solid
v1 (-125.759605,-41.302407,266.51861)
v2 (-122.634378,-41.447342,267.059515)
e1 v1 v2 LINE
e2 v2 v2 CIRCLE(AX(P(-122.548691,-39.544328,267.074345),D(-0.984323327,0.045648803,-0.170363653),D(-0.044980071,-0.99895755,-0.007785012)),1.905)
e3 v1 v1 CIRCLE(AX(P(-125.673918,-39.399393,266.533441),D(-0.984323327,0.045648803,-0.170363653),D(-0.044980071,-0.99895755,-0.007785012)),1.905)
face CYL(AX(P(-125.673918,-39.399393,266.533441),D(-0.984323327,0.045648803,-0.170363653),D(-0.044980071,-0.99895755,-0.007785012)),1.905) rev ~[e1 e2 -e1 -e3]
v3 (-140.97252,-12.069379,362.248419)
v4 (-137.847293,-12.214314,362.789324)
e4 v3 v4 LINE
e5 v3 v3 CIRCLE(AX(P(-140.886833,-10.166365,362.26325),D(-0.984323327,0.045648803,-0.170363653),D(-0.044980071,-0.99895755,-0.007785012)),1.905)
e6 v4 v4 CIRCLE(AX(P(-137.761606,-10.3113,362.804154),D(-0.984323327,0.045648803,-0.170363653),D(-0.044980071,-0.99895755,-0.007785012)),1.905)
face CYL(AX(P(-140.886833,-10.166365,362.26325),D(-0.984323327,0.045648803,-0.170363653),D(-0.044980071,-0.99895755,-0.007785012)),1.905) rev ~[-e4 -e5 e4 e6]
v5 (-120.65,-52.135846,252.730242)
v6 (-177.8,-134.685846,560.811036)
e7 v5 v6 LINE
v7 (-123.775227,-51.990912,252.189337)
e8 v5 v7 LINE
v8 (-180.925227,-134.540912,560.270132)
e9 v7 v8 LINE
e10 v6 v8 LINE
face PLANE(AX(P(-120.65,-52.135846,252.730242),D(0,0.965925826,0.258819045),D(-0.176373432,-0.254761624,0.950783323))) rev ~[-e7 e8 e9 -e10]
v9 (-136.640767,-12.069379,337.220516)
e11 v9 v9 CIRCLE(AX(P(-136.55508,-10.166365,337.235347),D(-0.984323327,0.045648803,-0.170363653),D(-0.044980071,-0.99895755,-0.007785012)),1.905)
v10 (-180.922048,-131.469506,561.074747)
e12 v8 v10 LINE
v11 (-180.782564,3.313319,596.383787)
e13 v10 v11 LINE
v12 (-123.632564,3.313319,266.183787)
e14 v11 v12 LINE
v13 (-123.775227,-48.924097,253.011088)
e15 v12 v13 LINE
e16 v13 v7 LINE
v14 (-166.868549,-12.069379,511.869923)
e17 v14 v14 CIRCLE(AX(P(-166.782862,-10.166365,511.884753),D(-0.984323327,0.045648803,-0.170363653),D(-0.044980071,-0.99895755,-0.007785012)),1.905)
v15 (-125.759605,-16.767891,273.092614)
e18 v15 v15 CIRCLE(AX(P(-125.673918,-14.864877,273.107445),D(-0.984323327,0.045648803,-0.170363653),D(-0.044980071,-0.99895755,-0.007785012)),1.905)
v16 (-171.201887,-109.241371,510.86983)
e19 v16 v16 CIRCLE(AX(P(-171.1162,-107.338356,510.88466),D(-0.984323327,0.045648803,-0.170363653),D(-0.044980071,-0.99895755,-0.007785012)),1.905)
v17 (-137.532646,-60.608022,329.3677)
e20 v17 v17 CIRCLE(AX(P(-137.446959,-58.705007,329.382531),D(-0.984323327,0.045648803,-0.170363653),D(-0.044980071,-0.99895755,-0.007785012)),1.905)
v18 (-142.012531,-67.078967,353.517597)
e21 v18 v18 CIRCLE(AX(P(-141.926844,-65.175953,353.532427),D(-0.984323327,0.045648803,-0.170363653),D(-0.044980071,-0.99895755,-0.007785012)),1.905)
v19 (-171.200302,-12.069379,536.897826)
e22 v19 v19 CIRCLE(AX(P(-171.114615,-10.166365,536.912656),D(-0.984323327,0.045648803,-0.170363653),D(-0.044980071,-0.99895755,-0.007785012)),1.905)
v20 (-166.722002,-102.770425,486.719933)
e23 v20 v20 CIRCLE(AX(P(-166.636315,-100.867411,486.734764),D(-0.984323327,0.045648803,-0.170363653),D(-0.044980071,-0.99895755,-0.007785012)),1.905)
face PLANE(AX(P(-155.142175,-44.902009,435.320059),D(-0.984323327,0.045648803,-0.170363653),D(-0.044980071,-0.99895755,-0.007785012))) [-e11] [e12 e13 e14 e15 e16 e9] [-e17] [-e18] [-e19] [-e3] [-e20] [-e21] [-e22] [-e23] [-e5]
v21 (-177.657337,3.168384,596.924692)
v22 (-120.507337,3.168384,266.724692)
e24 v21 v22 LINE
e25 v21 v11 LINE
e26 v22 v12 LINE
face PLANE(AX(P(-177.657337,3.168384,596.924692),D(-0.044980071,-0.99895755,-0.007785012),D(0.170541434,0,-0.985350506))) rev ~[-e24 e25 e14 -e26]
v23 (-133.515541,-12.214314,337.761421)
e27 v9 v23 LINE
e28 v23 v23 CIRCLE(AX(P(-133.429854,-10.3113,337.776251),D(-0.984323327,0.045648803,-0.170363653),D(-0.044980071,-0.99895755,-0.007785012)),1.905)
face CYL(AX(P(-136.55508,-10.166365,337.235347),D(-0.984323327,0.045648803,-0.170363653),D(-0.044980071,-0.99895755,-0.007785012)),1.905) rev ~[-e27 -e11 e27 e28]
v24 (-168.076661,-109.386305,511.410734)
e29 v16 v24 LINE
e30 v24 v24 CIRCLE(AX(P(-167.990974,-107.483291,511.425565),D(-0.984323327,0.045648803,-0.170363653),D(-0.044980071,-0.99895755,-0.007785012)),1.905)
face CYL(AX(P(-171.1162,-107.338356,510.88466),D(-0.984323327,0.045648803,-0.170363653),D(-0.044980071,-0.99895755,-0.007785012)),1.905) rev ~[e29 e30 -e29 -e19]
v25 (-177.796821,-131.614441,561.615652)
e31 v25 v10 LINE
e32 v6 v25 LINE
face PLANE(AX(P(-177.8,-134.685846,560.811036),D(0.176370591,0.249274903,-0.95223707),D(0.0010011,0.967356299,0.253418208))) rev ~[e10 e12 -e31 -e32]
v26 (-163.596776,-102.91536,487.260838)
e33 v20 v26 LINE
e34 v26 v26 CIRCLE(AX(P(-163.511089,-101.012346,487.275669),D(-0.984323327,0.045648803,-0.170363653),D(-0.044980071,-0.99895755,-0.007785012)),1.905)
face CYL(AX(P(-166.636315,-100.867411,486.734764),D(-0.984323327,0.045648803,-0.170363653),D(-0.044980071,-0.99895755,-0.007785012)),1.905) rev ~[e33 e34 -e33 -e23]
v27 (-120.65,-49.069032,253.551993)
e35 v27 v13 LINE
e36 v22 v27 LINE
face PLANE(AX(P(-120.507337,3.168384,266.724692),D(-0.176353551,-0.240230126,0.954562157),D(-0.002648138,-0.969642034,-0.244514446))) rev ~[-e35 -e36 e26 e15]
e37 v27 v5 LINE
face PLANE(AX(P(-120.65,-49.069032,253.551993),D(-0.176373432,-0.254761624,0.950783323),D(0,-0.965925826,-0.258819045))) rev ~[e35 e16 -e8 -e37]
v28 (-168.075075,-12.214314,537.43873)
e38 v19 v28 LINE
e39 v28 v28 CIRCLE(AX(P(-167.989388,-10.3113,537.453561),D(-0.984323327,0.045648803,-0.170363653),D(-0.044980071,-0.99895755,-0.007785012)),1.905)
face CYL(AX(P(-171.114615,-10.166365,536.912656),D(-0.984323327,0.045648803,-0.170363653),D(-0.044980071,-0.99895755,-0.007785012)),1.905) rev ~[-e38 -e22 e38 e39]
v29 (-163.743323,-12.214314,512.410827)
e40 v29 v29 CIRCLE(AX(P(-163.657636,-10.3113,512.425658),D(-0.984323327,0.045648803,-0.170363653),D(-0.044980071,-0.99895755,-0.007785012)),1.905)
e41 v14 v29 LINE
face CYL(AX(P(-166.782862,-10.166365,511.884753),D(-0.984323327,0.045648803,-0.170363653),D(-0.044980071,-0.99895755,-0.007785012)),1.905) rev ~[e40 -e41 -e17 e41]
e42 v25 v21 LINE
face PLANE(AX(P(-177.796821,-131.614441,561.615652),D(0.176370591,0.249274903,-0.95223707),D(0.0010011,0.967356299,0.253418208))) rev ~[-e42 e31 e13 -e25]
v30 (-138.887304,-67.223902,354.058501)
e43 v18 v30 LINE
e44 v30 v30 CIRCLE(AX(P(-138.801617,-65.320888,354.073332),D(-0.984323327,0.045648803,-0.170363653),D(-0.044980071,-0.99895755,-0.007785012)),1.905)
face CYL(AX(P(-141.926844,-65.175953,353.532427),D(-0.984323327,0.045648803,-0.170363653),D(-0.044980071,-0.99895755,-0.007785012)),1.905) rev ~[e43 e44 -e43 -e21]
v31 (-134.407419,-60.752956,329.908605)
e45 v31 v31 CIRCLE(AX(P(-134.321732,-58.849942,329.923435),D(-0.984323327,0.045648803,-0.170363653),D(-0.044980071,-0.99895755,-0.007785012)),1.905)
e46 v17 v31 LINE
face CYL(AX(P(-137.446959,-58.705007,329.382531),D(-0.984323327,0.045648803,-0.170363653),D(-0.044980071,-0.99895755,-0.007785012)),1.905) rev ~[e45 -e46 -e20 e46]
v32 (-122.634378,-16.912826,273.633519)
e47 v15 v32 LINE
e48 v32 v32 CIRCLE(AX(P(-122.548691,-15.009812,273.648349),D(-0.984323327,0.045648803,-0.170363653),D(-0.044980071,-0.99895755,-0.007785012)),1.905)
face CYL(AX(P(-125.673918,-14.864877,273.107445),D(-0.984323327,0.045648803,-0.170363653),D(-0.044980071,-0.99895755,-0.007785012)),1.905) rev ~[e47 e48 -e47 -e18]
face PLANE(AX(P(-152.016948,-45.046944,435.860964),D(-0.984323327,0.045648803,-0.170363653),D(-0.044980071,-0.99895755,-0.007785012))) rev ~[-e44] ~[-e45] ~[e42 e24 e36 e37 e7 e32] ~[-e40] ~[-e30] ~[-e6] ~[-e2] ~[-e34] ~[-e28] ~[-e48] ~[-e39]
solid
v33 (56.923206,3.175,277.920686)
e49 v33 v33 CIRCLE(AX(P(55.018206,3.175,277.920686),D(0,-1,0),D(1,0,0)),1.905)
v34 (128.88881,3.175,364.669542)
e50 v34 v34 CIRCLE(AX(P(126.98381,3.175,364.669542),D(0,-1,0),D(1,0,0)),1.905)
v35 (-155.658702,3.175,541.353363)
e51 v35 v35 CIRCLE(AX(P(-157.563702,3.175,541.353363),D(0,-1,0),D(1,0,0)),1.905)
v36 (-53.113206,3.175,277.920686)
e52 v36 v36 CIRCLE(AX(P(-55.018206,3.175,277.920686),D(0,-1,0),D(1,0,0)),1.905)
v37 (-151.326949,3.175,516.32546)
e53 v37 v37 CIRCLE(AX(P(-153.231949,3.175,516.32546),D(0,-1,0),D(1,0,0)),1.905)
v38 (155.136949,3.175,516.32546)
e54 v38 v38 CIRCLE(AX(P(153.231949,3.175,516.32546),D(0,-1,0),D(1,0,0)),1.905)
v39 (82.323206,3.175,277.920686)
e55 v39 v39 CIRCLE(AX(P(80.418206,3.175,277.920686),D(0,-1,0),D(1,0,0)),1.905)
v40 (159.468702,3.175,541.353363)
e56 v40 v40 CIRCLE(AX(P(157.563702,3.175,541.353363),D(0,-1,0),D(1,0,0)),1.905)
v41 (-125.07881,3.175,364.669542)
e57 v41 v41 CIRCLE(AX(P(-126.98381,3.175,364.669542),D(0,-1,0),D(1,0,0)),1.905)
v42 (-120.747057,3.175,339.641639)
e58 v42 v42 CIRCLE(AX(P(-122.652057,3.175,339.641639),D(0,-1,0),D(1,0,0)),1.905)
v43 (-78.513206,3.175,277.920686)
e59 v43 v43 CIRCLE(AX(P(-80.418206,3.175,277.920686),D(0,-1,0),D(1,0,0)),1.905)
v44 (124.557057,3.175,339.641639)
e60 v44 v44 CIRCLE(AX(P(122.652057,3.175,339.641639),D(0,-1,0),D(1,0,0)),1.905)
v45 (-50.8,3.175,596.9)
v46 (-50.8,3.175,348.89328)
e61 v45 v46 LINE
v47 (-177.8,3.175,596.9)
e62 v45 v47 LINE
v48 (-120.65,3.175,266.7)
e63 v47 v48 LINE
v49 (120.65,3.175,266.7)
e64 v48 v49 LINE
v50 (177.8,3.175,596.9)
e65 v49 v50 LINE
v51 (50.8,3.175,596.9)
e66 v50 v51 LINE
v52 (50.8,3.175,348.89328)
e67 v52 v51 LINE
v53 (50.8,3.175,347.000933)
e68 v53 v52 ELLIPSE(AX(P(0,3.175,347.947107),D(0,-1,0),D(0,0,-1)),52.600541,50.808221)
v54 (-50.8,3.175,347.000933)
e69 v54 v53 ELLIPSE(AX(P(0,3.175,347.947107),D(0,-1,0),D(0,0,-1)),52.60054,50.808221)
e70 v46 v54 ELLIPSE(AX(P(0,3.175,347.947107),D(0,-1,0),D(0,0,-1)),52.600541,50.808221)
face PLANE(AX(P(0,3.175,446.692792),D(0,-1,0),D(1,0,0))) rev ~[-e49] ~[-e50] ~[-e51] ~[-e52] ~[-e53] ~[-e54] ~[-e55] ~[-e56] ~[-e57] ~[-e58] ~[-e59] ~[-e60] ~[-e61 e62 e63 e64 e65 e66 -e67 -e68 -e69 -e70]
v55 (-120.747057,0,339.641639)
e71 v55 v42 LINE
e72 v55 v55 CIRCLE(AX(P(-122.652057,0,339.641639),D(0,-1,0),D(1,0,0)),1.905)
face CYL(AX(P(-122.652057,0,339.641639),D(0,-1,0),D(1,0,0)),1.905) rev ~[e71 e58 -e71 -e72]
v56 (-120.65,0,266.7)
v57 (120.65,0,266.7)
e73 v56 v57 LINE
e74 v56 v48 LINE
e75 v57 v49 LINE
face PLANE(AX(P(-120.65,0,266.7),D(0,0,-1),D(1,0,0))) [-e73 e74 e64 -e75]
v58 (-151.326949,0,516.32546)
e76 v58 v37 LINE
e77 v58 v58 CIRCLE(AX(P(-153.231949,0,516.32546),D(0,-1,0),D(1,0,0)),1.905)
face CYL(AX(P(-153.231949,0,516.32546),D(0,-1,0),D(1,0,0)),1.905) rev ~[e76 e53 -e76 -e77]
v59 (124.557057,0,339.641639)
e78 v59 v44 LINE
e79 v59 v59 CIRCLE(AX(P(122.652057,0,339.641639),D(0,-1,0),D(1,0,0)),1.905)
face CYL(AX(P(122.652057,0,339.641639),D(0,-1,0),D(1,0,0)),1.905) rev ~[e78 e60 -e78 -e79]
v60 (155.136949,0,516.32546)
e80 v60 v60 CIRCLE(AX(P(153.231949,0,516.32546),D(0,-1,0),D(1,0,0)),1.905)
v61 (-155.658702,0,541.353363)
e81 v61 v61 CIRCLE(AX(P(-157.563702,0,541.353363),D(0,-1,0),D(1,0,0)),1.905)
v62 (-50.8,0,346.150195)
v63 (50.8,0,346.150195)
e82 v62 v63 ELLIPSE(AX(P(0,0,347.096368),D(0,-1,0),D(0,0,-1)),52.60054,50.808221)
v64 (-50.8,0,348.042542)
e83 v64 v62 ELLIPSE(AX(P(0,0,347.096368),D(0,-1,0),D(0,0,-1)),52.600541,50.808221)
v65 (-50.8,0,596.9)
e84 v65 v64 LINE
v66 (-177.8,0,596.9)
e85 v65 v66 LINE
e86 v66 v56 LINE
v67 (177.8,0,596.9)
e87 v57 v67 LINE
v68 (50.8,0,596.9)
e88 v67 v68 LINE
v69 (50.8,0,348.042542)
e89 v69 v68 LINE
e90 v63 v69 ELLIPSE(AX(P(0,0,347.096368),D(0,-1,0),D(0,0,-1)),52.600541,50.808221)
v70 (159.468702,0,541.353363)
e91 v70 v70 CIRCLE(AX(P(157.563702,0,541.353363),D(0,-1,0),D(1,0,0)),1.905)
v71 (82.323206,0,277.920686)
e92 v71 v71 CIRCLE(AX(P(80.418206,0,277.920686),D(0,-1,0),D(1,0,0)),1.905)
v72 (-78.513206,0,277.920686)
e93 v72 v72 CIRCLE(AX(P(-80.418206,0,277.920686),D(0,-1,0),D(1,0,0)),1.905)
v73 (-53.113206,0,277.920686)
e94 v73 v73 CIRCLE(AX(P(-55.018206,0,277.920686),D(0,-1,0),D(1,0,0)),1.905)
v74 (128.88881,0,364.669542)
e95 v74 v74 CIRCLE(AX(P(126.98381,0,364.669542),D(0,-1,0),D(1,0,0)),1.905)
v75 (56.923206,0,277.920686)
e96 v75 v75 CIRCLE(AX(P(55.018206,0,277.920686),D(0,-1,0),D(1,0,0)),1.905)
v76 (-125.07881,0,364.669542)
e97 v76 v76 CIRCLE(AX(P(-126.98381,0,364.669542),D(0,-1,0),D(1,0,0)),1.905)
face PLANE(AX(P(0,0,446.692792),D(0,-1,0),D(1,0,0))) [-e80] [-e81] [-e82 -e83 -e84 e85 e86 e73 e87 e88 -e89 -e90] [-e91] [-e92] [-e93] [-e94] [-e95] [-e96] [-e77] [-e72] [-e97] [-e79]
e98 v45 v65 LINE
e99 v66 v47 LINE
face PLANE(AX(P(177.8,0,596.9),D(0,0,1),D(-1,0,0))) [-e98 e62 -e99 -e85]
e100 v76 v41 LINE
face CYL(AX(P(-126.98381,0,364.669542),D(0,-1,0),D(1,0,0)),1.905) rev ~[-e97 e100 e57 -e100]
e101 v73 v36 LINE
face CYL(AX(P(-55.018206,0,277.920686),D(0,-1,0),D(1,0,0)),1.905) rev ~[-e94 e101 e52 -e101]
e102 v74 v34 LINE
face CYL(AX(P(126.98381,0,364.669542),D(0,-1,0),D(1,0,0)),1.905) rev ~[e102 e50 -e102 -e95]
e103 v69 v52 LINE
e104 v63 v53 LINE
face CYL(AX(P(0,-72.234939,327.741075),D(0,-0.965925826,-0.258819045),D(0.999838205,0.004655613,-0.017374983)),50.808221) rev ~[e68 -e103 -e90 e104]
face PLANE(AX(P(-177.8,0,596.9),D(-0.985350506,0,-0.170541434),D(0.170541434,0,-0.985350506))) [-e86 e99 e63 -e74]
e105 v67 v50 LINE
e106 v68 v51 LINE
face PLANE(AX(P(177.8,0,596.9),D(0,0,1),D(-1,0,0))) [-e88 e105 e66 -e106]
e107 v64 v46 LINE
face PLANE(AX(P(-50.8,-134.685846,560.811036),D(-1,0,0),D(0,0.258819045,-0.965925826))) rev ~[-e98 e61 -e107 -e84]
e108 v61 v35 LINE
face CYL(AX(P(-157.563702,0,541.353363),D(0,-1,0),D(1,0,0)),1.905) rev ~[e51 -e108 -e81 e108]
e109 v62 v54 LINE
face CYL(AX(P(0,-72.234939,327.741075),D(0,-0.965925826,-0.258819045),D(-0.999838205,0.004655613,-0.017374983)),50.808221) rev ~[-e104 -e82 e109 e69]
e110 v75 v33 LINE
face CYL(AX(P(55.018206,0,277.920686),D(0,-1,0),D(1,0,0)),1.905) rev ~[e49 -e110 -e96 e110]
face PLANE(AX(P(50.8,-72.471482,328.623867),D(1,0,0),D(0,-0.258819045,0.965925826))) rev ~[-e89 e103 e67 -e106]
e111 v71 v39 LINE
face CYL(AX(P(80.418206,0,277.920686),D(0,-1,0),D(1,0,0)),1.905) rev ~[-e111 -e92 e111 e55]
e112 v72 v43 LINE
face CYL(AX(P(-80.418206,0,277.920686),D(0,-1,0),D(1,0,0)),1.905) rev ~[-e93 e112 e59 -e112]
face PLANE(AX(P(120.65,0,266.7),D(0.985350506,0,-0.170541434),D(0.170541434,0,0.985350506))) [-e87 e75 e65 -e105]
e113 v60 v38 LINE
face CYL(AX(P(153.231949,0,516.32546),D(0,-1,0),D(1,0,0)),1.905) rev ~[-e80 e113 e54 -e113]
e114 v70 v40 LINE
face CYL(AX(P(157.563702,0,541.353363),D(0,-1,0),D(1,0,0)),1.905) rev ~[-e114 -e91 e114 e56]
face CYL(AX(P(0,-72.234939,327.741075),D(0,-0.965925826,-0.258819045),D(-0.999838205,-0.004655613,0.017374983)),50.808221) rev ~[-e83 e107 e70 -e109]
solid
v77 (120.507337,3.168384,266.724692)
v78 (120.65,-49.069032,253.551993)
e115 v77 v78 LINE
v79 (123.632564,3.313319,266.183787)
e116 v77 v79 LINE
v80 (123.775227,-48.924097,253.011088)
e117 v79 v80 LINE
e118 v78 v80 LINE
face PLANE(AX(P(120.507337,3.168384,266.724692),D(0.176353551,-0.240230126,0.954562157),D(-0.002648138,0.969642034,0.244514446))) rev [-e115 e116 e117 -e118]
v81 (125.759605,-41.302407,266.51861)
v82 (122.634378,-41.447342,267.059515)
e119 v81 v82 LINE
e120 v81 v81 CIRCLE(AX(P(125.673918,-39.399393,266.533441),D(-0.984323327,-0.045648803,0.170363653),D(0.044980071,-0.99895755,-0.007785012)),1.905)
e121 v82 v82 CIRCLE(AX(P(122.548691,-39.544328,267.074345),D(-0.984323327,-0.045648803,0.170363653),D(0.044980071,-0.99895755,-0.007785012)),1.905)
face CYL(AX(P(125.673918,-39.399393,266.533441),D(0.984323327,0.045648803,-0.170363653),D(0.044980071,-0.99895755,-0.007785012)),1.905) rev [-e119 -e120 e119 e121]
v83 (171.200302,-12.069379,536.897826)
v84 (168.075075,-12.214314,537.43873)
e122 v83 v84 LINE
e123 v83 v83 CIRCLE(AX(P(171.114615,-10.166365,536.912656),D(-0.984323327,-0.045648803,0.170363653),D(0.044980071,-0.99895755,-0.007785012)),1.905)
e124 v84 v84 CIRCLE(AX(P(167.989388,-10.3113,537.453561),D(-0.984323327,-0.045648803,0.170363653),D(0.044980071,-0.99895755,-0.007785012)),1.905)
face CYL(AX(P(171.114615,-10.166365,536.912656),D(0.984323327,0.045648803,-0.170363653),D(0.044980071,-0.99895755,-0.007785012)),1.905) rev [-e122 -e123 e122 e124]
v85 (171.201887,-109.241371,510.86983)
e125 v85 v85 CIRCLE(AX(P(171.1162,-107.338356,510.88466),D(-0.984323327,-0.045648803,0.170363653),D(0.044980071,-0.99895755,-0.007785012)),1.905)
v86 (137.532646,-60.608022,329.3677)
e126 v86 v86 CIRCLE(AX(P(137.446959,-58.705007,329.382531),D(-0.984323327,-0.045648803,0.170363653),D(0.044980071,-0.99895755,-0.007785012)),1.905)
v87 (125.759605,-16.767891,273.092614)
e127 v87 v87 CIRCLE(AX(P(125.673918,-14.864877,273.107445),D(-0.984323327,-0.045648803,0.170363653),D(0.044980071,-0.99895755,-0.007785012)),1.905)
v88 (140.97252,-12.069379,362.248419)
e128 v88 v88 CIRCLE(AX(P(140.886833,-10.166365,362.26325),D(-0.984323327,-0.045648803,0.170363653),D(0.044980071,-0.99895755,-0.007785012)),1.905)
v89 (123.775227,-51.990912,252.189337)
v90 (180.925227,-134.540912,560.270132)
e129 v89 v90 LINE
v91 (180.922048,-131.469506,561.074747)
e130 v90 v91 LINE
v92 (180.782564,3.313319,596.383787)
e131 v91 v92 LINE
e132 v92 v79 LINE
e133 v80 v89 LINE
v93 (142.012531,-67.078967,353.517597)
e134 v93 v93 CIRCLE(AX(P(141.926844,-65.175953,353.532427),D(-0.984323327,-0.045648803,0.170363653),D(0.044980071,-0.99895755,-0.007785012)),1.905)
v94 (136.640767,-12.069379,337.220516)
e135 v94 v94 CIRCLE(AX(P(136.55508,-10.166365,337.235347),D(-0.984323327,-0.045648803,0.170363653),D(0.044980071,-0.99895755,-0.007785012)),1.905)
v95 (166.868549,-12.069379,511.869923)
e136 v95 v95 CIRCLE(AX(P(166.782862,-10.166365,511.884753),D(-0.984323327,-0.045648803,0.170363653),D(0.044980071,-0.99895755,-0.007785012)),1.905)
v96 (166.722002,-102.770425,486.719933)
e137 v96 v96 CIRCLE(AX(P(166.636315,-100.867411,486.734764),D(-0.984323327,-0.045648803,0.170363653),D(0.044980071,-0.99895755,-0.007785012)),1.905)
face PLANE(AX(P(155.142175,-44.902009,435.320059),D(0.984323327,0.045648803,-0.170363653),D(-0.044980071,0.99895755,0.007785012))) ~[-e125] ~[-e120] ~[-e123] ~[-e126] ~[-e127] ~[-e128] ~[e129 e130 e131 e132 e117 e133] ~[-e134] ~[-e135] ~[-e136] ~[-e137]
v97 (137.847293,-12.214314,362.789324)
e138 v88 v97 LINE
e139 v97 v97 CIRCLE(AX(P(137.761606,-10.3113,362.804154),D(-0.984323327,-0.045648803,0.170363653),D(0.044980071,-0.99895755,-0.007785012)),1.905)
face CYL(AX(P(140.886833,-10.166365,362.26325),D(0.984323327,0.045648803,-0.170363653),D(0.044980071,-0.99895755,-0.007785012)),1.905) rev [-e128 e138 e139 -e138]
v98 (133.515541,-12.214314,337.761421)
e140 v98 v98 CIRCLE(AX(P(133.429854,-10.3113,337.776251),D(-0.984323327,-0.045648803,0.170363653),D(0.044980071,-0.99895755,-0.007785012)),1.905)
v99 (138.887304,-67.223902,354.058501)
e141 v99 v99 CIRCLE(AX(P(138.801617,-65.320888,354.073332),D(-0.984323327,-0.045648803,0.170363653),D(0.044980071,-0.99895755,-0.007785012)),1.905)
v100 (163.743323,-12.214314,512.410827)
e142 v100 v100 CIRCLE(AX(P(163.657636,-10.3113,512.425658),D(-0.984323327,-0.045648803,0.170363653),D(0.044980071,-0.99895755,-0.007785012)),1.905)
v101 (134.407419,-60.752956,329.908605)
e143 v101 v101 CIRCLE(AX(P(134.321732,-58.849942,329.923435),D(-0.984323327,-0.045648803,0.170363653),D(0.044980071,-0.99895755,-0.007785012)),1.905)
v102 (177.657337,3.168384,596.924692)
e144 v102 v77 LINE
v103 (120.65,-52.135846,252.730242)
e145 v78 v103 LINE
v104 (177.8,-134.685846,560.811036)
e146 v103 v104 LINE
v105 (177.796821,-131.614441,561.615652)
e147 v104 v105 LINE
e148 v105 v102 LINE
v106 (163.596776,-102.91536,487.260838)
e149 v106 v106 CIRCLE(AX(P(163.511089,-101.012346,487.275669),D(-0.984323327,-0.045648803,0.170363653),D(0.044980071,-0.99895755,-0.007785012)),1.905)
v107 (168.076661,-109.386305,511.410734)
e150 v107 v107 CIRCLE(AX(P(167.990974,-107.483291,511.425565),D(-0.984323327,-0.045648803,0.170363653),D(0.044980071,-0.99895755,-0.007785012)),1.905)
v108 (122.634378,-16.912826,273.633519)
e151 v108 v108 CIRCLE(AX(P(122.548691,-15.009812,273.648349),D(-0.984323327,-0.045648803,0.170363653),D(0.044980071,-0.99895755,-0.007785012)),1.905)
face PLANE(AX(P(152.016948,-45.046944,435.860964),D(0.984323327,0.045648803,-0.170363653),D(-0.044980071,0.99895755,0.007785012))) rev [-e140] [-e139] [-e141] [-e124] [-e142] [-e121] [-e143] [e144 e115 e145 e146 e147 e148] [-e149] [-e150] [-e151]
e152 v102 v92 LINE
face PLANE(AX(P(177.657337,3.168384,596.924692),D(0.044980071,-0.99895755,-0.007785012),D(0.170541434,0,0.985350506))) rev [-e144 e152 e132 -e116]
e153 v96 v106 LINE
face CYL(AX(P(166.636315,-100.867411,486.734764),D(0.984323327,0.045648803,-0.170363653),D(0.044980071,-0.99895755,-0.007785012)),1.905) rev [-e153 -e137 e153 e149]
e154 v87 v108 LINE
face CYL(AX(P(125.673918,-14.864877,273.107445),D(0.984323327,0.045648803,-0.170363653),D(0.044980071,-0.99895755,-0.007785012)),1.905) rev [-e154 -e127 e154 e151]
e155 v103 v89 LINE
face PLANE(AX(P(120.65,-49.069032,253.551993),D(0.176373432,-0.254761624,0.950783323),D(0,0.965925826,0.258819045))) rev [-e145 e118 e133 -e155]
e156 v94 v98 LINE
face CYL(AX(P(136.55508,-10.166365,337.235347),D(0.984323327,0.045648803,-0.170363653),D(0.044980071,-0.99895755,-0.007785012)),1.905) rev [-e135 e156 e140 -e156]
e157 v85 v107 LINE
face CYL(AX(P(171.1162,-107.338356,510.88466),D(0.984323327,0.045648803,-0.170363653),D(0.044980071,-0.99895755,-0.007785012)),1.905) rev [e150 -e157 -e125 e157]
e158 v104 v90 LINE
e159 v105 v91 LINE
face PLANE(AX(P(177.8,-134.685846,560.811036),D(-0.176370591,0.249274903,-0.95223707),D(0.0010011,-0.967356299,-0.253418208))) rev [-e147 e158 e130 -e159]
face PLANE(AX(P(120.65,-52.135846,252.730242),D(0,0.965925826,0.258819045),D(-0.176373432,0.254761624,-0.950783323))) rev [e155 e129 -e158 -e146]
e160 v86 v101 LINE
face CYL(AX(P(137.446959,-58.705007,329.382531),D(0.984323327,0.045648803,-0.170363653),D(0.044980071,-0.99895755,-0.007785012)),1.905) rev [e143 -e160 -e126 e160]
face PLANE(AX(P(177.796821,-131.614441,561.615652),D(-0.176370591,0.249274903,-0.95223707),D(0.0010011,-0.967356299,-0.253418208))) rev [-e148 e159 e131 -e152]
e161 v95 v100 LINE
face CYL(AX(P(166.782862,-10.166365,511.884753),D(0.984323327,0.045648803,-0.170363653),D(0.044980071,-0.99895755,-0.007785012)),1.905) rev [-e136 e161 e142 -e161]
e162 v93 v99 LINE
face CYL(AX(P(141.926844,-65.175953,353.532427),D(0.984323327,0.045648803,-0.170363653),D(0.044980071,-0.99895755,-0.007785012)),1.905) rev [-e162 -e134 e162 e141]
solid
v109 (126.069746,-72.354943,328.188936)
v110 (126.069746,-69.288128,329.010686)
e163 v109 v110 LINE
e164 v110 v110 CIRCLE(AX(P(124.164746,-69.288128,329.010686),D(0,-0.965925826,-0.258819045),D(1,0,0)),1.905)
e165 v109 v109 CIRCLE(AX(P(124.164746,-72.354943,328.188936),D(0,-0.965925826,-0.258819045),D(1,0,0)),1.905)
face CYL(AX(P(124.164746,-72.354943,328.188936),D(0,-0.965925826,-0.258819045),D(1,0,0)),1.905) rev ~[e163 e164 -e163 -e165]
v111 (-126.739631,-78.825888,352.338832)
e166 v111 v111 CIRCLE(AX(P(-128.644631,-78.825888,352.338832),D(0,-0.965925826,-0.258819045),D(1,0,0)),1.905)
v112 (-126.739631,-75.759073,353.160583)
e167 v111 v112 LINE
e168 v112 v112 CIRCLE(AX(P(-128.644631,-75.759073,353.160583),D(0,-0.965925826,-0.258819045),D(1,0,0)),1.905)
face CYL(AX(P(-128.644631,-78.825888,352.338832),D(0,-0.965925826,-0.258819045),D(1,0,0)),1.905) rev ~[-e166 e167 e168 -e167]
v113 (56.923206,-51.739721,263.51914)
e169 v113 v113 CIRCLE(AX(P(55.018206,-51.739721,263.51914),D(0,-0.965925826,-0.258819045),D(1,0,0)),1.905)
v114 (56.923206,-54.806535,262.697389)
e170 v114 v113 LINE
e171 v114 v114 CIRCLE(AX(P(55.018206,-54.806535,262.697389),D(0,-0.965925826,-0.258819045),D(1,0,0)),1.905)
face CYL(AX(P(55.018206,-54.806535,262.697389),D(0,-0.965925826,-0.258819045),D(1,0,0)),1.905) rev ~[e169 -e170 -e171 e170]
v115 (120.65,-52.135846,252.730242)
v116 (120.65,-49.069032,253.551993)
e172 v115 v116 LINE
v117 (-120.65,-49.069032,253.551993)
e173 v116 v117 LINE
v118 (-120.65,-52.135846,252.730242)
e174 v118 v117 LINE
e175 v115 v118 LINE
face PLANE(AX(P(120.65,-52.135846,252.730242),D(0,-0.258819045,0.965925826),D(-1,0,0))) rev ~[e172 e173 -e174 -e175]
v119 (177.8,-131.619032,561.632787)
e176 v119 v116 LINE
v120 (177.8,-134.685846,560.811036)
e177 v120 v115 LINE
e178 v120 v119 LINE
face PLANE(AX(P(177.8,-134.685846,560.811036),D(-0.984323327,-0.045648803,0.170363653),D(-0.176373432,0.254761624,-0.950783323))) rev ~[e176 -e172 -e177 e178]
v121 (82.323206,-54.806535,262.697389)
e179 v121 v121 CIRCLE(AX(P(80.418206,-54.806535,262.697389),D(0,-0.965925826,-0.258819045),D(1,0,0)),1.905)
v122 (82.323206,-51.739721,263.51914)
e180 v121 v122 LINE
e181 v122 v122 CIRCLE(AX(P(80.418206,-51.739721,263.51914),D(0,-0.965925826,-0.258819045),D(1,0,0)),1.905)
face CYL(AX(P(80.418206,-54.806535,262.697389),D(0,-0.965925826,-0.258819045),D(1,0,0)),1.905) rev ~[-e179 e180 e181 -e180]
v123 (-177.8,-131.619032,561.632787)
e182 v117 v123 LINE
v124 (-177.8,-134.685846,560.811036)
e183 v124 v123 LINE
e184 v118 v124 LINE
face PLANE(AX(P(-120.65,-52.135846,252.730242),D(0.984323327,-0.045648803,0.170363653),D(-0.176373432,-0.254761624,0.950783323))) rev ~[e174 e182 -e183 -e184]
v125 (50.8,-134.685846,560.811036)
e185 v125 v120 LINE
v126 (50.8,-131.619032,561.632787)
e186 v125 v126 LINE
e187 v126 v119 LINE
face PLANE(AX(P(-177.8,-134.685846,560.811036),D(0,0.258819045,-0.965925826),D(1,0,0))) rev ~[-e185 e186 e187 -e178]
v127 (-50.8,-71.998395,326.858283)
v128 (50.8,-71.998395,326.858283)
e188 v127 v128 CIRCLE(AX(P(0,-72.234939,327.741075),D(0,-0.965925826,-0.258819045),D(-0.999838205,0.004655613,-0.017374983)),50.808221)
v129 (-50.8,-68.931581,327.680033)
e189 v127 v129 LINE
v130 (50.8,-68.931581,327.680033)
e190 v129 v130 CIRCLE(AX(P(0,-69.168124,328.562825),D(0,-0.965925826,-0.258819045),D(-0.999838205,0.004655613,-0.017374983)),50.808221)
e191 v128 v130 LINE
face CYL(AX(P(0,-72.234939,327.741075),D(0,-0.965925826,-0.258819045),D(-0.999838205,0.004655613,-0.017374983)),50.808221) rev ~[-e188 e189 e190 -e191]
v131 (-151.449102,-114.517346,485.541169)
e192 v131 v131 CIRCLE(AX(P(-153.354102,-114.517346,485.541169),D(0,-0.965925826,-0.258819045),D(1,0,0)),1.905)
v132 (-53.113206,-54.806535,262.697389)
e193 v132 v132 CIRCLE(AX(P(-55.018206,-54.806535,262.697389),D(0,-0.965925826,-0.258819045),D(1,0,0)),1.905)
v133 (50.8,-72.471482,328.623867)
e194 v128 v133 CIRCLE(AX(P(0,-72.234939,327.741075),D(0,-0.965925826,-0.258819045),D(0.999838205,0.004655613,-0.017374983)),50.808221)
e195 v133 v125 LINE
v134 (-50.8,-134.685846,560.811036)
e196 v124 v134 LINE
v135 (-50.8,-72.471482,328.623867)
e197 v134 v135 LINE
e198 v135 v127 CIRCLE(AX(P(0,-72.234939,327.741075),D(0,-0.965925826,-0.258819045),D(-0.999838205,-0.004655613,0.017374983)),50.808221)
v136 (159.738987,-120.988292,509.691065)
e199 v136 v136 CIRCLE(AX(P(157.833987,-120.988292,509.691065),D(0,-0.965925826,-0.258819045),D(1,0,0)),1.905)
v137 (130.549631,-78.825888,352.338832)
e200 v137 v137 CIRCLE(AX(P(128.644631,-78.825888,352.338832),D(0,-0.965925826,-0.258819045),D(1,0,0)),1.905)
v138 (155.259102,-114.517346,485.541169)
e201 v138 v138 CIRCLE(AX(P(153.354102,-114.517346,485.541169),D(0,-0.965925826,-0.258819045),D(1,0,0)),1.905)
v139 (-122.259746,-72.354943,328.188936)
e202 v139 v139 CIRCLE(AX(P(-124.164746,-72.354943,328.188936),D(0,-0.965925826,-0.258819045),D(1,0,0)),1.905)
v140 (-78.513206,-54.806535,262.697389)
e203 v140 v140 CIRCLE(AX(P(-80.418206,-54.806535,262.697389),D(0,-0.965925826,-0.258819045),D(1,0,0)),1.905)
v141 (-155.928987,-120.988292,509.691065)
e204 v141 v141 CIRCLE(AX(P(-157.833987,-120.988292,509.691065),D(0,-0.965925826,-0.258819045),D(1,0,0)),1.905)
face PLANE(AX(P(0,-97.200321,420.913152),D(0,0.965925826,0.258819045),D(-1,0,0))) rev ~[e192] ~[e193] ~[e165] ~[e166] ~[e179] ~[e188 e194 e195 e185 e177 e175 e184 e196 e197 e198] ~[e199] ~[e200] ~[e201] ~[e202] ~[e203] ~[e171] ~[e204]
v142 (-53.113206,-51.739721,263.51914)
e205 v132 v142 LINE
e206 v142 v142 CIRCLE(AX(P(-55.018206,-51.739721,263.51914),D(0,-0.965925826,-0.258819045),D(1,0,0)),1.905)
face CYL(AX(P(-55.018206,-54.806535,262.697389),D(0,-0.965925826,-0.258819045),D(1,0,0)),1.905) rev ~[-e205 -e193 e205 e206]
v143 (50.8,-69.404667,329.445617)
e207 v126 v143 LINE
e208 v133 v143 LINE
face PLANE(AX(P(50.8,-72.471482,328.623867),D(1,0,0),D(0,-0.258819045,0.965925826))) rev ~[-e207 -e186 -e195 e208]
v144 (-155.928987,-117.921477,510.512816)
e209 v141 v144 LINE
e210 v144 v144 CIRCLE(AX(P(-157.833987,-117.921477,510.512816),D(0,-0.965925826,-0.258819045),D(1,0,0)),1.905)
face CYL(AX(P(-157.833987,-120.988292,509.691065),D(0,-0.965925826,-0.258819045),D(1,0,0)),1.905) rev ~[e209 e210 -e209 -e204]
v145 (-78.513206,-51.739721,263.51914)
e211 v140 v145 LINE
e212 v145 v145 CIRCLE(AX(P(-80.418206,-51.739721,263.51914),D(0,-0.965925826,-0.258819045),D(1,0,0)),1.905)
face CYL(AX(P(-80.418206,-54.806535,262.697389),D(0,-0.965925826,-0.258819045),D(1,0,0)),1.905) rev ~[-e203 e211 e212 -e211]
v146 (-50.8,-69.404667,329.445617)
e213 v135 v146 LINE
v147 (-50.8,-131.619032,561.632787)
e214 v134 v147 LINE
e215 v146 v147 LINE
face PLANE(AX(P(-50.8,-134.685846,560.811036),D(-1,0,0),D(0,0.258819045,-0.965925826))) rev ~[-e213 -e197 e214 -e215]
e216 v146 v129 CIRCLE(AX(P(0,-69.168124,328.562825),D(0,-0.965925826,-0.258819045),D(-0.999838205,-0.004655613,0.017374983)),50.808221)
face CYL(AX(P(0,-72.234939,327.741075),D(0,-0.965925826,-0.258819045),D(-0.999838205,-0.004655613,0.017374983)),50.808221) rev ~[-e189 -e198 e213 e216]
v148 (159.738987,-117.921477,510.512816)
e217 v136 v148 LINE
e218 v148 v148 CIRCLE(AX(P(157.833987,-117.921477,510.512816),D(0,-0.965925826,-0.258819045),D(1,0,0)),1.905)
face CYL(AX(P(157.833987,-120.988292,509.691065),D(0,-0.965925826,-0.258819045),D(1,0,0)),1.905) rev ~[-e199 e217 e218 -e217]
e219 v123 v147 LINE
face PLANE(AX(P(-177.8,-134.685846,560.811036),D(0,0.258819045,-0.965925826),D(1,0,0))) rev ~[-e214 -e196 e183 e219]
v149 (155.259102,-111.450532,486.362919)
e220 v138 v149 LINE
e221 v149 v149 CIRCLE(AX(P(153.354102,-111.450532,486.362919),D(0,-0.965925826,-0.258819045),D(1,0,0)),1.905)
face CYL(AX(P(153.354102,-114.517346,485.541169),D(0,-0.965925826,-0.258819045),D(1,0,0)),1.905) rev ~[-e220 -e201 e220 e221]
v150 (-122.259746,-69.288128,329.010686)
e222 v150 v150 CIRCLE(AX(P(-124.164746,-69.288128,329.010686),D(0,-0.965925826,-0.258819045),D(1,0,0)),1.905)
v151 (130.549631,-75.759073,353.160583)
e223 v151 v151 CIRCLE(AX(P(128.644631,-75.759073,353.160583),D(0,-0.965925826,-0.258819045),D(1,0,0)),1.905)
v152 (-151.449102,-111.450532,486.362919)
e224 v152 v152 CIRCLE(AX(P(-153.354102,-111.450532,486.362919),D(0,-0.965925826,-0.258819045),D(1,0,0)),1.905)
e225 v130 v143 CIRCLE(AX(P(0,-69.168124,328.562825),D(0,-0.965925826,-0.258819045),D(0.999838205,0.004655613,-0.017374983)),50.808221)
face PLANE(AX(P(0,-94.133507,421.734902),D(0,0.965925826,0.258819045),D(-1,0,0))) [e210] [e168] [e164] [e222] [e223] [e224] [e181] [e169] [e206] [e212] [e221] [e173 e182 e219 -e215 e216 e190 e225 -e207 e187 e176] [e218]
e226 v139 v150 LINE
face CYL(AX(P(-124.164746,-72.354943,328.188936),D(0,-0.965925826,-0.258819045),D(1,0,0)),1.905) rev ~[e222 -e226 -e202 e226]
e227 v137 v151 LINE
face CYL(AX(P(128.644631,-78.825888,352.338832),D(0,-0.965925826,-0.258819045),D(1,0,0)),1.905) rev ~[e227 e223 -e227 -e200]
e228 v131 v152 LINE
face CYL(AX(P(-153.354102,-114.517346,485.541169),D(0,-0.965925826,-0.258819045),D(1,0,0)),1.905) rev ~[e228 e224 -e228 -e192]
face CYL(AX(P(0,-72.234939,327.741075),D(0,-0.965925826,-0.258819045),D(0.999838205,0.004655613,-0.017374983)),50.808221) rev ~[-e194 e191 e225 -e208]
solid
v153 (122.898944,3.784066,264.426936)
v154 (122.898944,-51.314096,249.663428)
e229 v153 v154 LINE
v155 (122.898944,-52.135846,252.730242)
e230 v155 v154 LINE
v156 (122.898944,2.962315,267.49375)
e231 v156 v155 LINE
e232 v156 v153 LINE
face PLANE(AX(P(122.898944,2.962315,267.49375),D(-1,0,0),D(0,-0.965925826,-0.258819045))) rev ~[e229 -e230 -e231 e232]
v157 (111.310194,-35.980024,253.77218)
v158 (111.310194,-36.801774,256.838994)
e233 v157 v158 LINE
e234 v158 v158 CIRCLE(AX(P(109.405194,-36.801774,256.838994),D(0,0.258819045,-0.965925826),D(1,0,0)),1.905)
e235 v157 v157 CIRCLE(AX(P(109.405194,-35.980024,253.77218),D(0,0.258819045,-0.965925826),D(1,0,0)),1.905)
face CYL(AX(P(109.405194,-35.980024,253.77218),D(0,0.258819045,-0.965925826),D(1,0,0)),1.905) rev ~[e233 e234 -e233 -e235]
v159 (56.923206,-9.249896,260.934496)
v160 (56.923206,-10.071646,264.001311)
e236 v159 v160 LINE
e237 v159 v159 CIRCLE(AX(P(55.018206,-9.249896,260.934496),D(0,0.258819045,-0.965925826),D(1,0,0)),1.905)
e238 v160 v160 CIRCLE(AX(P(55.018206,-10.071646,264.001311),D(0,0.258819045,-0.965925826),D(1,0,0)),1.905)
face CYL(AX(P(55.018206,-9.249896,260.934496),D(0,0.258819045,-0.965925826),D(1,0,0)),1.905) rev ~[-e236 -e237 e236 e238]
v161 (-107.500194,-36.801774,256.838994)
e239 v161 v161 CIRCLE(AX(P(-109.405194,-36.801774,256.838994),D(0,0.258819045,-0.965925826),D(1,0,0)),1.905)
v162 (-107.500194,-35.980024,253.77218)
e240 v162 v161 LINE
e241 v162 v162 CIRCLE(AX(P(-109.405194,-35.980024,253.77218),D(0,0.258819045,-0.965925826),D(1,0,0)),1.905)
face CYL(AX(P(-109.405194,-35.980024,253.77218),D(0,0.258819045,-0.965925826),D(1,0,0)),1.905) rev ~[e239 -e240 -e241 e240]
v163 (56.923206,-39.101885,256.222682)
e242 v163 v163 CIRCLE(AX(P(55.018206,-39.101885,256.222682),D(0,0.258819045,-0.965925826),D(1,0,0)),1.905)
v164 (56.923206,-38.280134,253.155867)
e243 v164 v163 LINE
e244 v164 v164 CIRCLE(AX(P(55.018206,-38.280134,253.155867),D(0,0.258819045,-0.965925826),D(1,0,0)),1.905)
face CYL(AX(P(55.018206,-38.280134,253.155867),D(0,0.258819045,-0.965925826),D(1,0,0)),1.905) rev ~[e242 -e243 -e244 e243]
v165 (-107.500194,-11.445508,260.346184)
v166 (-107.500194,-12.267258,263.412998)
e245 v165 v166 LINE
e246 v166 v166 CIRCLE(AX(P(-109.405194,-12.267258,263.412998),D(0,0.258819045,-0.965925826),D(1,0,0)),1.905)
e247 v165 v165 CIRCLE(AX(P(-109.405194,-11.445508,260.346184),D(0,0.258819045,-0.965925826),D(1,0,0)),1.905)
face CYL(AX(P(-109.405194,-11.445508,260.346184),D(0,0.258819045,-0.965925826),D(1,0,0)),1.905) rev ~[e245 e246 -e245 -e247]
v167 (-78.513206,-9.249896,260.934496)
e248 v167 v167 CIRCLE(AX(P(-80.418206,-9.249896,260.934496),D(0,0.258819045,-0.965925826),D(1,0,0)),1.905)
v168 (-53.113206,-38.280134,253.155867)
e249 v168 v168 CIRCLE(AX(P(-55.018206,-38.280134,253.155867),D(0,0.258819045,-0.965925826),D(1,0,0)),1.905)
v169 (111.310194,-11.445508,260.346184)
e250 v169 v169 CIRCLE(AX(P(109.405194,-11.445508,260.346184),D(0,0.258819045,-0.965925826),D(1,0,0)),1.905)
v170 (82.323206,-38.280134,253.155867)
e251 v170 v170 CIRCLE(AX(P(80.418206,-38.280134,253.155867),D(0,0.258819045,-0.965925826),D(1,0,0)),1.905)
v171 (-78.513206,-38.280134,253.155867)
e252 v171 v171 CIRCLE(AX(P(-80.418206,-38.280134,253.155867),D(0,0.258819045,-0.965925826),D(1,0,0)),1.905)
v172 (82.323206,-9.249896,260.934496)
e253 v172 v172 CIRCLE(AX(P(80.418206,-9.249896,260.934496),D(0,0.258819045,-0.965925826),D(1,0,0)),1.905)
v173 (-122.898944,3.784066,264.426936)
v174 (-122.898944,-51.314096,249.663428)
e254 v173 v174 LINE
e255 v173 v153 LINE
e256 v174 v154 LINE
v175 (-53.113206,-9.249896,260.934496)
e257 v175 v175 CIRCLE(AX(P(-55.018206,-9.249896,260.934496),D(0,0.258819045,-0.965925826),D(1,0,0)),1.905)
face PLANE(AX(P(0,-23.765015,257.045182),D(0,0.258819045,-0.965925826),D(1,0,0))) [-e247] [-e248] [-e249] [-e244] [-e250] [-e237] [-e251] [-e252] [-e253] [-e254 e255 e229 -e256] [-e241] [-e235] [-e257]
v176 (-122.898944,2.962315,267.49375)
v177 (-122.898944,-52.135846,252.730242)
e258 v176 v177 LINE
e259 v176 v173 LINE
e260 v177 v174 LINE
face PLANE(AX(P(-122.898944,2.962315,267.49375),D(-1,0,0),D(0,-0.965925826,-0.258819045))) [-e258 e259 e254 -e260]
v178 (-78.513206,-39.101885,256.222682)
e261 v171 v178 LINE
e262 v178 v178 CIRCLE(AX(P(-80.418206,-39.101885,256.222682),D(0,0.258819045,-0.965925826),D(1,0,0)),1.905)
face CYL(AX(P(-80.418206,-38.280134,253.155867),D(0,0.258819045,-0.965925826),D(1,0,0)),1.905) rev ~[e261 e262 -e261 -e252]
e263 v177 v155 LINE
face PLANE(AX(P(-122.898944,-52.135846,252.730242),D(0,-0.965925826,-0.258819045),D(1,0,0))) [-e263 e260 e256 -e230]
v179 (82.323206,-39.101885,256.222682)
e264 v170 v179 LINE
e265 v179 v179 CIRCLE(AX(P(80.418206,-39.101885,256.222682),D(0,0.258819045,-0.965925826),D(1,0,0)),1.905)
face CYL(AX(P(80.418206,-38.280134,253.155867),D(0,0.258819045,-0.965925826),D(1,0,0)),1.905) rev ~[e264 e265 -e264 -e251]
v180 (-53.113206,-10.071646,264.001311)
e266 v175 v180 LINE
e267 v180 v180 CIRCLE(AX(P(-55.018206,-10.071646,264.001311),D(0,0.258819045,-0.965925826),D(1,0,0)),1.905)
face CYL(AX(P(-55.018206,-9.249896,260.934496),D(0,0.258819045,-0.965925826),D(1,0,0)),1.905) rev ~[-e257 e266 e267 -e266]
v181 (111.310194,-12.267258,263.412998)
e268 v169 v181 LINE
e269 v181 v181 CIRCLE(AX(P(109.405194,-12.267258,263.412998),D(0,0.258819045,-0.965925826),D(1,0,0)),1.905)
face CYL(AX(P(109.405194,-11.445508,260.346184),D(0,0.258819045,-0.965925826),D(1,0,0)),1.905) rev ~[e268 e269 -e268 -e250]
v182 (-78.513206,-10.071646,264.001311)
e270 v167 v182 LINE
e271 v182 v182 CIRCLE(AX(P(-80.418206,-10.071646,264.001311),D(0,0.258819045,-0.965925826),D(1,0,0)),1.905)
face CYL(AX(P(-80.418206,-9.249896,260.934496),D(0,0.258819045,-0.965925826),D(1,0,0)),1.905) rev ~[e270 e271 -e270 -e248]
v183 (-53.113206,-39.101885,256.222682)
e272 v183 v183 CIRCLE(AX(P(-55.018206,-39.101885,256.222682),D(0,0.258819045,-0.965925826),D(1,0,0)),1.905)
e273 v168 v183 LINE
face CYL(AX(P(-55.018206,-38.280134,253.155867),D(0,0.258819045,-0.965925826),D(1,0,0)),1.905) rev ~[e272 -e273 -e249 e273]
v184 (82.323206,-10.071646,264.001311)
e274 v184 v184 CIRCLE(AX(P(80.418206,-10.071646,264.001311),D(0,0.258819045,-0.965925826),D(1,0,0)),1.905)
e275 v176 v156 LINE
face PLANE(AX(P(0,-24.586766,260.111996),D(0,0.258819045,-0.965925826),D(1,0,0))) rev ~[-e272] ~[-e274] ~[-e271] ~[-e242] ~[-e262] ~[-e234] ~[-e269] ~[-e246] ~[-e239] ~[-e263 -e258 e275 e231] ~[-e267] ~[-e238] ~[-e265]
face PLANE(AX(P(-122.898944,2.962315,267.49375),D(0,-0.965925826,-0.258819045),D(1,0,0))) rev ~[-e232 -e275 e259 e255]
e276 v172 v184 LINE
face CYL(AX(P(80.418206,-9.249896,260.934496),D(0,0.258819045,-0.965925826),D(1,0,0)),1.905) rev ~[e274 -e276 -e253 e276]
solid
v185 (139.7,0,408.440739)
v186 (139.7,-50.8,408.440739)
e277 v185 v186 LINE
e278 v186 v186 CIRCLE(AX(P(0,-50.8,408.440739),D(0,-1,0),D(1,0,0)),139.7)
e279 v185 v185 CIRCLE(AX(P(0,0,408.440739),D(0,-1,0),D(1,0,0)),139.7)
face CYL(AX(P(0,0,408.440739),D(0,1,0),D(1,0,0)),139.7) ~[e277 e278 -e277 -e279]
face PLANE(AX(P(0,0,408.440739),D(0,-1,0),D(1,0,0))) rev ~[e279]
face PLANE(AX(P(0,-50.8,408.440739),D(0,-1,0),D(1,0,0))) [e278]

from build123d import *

# Parameters (mm, degrees)
F2_DEPTH  = 3.175
F3_R      = 139.7
F4_DEPTH  = 50.8
F8_DEPTH  = 3.175
F10_DEPTH = 3.175
F12_W     = 245.7978874445
F12_H     = 57.0418144985
F13_DEPTH = 3.175
F14_R     = 1.905
F15_DEPTH = 3.175
F16_R     = 1.905
F17_DEPTH = 362.430062838
F20_R     = 1.905
F21_DEPTH = 3.175
F22_R     = 1.905
F23_DEPTH = 3.175
F25_DEPTH = 143.0995662429


with BuildPart() as f2:
    # F1 (on Front) → F2 (new body)
    with BuildSketch(Plane.XZ):
        Polygon((120.65, 266.7), (177.8, 596.9), (-177.8, 596.9), (-120.65, 266.7), align=None)
    extrude(amount=-F2_DEPTH)

    # F20 (on face) → F21 (cut, through all)
    with BuildSketch(Plane.XZ):
        with Locations((-157.56370177, 541.3533633243)):
            Circle(F20_R)
        with Locations((-153.2319493539, 516.3254604756)):
            Circle(F20_R)
        with Locations((-126.9838096234, 364.6695420328)):
            Circle(F20_R)
        with Locations((-122.6520572073, 339.641639184)):
            Circle(F20_R)
        with Locations((-55.0182062805, 277.9206855015)):
            Circle(F20_R)
        with Locations((-80.4182062805, 277.9206855015)):
            Circle(F20_R)
        with Locations((126.9838096234, 364.6695420328)):
            Circle(F20_R)
        with Locations((153.2319493539, 516.3254604756)):
            Circle(F20_R)
        with Locations((157.56370177, 541.3533633243)):
            Circle(F20_R)
        with Locations((122.6520572073, 339.641639184)):
            Circle(F20_R)
        with Locations((55.0182062805, 277.9206855015)):
            Circle(F20_R)
        with Locations((80.4182062805, 277.9206855015)):
            Circle(F20_R)
    extrude(amount=-F21_DEPTH, mode=Mode.SUBTRACT)


with BuildPart() as f4:
    # F3 (on face) → F4 (new body)
    with BuildSketch(Plane.XZ):
        with Locations((0, 408.4407389164)):
            Circle(F3_R)
    extrude(amount=F4_DEPTH)


with BuildPart() as f8:
    # F7 (on face) → F8 (new body)
    with BuildSketch(Plane(origin=(0, 14.539153526, 3.8957544459), x_dir=(-1, 0, 0), z_dir=(0, 0.9659258263, 0.2588190451))):
        Polygon((120.65, 257.6124178713), (177.8, 576.5611257119), (-177.8, 576.5611257119), (-120.65, 257.6124178713), align=None)
    extrude(amount=F8_DEPTH)

    # F14 (on face) → F15 (cut, through all)
    with BuildSketch(Plane(origin=(0, 14.539153526, 3.8957544459), x_dir=(1, 0, 0), z_dir=(0, -0.9659258263, -0.2588190451))):
        with Locations((-157.833987404, 523.6378375606)):
            Circle(F14_R)
        with Locations((-153.3541022377, 498.6360250484)):
            Circle(F14_R)
        with Locations((-128.6446309343, 360.7348186858)):
            Circle(F14_R)
        with Locations((-124.164745768, 335.7330061736)):
            Circle(F14_R)
        with Locations((-80.4182062805, 267.9311678713)):
            Circle(F14_R)
        with Locations((-55.0182062805, 267.9311678713)):
            Circle(F14_R)
        with Locations((128.6446309343, 360.7348186858)):
            Circle(F14_R)
        with Locations((157.833987404, 523.6378375606)):
            Circle(F14_R)
        with Locations((55.0182062805, 267.9311678713)):
            Circle(F14_R)
        with Locations((124.164745768, 335.7330061736)):
            Circle(F14_R)
        with Locations((153.3541022377, 498.6360250484)):
            Circle(F14_R)
        with Locations((80.4182062805, 267.9311678713)):
            Circle(F14_R)
    extrude(amount=-F15_DEPTH, mode=Mode.SUBTRACT)


with BuildPart() as f10:
    # F9 (on face) → F10 (new body)
    with BuildSketch(Plane(origin=(-72.1731684636, 3.347089997, -12.4915099264), x_dir=(-0.0449800713, -0.99895755, -0.0077850123), z_dir=(-0.9843233273, 0.0456488032, -0.1703636528))):
        Polygon((135.102368204, 583.7099916129), (0.1788925906, 618.477983858), (0.1788925906, 283.3688038882), (52.4708201773, 270.4134080558), align=None)
        Polygon((138.1769790582, 582.9177051272), (135.102368204, 583.7099916129), (52.4708201773, 270.4134080558), (55.5408350126, 269.6036958163), align=None)
    extrude(amount=F10_DEPTH)


with BuildPart() as f11_1:
    # F11: instance of F10
    add(f10.part.mirror(Plane.YZ))


with BuildPart() as f13:
    # F12 (on face) → F13 (new body)
    with BuildSketch(Plane(origin=(0, -66.675, 248.8344875947), x_dir=(1, 0, 0), z_dir=(0, 0.2588190451, -0.9659258263))):
        with Locations((0, -43.5729465781)):
            Rectangle(F12_W, F12_H)
    extrude(amount=F13_DEPTH)

    # F22 (on face) → F23 (cut, through all)
    with BuildSketch(Plane(origin=(0, -65.8532495318, 245.7676730962), x_dir=(1, 0, 0), z_dir=(0, 0.2588190451, -0.9659258263))):
        with Locations((-80.4182062805, -28.5457893288)):
            Circle(F22_R)
        with Locations((-55.0182062805, -28.5457893288)):
            Circle(F22_R)
        with Locations((-80.4182062805, -58.6001038273)):
            Circle(F22_R)
        with Locations((-55.0182062805, -58.6001038273)):
            Circle(F22_R)
        with Locations((-109.4051937222, -30.9270393288)):
            Circle(F22_R)
        with Locations((-109.4051937222, -56.3270393288)):
            Circle(F22_R)
        with Locations((109.4051937222, -30.9270393288)):
            Circle(F22_R)
        with Locations((80.4182062805, -58.6001038273)):
            Circle(F22_R)
        with Locations((55.0182062805, -58.6001038273)):
            Circle(F22_R)
        with Locations((55.0182062805, -28.5457893288)):
            Circle(F22_R)
        with Locations((109.4051937222, -56.3270393288)):
            Circle(F22_R)
        with Locations((80.4182062805, -28.5457893288)):
            Circle(F22_R)
    extrude(amount=-F23_DEPTH, mode=Mode.SUBTRACT)


with BuildPart() as f10_1:
    add(f10.part)

    # F16 (on face) → F17 (cut, through all)
    with BuildSketch(Plane(origin=(-75.2983950276, 3.4920249471, -13.032414524), x_dir=(-0.0449800713, -0.99895755, -0.0077850123), z_dir=(-0.9843233273, 0.0456488032, -0.1703636528))):
        with Locations((62.2619372863, 347.9976447297)):
            Circle(F16_R)
        with Locations((68.7396352026, 372.5577634123)):
            Circle(F16_R)
        with Locations((104.4683391381, 508.022741925)):
            Circle(F16_R)
        with Locations((110.9460370543, 532.5828606076)):
            Circle(F16_R)
        with Locations((13.6726425906, 558.2292888641)):
            Circle(F16_R)
        with Locations((13.6726425906, 532.8292888641)):
            Circle(F16_R)
        with Locations((13.6726425906, 380.9833186626)):
            Circle(F16_R)
        with Locations((13.6726425906, 355.5833186626)):
            Circle(F16_R)
        with Locations((18.3760581746, 290.5391688496)):
            Circle(F16_R)
        with Locations((42.9361768572, 284.0614709334)):
            Circle(F16_R)
    extrude(amount=-F17_DEPTH, mode=Mode.SUBTRACT)


with BuildPart() as f19_1:
    # F19: instance of F10
    add(f10_1.part.mirror(Plane.YZ))


with BuildPart() as f25_tool:
    # F24 (on face) → F25 (new body, through all)
    with BuildSketch(Plane(origin=(0, 14.539153526, 3.8957544459), x_dir=(1, 0, 0), z_dir=(0, -0.9659258263, -0.2588190451))):
        with BuildLine():
            Line((50.8, 336.1832797527), (50.8, 576.5611257119))
            Line((50.8, 576.5611257119), (-50.8, 576.5611257119))
            Line((-50.8, 576.5611257119), (-50.8, 336.1832797527))
            Line((-50.8, 336.1832797527), (-50.8, 334.3554127512))
            ThreePointArc((-50.8, 334.3554127512), (0, 284.4611257119), (50.8, 334.3554127512))
            Line((50.8, 334.3554127512), (50.8, 336.1832797527))
        make_face()
        with BuildLine():
            ThreePointArc((50.8, 334.3554127512), (50.80822054, 335.269346252), (50.8, 336.1832797527))
            Line((50.8, 336.1832797527), (50.8, 334.3554127512))
        make_face()
        with BuildLine():
            Line((-50.8, 334.3554127512), (-50.8, 336.1832797527))
            ThreePointArc((-50.8, 336.1832797527), (-50.80822054, 335.269346252), (-50.8, 334.3554127512))
        make_face()
    extrude(amount=-F25_DEPTH)


with BuildPart() as f2_1:
    add(f2.part)

    # F25: cut by f25_tool
    add(f25_tool.part, mode=Mode.SUBTRACT)


with BuildPart() as f8_1:
    add(f8.part)

    # F25: cut by f25_tool
    add(f25_tool.part, mode=Mode.SUBTRACT)


solid = Compound([f4.part, f13.part, f10_1.part, f19_1.part, f2_1.part, f8_1.part])
